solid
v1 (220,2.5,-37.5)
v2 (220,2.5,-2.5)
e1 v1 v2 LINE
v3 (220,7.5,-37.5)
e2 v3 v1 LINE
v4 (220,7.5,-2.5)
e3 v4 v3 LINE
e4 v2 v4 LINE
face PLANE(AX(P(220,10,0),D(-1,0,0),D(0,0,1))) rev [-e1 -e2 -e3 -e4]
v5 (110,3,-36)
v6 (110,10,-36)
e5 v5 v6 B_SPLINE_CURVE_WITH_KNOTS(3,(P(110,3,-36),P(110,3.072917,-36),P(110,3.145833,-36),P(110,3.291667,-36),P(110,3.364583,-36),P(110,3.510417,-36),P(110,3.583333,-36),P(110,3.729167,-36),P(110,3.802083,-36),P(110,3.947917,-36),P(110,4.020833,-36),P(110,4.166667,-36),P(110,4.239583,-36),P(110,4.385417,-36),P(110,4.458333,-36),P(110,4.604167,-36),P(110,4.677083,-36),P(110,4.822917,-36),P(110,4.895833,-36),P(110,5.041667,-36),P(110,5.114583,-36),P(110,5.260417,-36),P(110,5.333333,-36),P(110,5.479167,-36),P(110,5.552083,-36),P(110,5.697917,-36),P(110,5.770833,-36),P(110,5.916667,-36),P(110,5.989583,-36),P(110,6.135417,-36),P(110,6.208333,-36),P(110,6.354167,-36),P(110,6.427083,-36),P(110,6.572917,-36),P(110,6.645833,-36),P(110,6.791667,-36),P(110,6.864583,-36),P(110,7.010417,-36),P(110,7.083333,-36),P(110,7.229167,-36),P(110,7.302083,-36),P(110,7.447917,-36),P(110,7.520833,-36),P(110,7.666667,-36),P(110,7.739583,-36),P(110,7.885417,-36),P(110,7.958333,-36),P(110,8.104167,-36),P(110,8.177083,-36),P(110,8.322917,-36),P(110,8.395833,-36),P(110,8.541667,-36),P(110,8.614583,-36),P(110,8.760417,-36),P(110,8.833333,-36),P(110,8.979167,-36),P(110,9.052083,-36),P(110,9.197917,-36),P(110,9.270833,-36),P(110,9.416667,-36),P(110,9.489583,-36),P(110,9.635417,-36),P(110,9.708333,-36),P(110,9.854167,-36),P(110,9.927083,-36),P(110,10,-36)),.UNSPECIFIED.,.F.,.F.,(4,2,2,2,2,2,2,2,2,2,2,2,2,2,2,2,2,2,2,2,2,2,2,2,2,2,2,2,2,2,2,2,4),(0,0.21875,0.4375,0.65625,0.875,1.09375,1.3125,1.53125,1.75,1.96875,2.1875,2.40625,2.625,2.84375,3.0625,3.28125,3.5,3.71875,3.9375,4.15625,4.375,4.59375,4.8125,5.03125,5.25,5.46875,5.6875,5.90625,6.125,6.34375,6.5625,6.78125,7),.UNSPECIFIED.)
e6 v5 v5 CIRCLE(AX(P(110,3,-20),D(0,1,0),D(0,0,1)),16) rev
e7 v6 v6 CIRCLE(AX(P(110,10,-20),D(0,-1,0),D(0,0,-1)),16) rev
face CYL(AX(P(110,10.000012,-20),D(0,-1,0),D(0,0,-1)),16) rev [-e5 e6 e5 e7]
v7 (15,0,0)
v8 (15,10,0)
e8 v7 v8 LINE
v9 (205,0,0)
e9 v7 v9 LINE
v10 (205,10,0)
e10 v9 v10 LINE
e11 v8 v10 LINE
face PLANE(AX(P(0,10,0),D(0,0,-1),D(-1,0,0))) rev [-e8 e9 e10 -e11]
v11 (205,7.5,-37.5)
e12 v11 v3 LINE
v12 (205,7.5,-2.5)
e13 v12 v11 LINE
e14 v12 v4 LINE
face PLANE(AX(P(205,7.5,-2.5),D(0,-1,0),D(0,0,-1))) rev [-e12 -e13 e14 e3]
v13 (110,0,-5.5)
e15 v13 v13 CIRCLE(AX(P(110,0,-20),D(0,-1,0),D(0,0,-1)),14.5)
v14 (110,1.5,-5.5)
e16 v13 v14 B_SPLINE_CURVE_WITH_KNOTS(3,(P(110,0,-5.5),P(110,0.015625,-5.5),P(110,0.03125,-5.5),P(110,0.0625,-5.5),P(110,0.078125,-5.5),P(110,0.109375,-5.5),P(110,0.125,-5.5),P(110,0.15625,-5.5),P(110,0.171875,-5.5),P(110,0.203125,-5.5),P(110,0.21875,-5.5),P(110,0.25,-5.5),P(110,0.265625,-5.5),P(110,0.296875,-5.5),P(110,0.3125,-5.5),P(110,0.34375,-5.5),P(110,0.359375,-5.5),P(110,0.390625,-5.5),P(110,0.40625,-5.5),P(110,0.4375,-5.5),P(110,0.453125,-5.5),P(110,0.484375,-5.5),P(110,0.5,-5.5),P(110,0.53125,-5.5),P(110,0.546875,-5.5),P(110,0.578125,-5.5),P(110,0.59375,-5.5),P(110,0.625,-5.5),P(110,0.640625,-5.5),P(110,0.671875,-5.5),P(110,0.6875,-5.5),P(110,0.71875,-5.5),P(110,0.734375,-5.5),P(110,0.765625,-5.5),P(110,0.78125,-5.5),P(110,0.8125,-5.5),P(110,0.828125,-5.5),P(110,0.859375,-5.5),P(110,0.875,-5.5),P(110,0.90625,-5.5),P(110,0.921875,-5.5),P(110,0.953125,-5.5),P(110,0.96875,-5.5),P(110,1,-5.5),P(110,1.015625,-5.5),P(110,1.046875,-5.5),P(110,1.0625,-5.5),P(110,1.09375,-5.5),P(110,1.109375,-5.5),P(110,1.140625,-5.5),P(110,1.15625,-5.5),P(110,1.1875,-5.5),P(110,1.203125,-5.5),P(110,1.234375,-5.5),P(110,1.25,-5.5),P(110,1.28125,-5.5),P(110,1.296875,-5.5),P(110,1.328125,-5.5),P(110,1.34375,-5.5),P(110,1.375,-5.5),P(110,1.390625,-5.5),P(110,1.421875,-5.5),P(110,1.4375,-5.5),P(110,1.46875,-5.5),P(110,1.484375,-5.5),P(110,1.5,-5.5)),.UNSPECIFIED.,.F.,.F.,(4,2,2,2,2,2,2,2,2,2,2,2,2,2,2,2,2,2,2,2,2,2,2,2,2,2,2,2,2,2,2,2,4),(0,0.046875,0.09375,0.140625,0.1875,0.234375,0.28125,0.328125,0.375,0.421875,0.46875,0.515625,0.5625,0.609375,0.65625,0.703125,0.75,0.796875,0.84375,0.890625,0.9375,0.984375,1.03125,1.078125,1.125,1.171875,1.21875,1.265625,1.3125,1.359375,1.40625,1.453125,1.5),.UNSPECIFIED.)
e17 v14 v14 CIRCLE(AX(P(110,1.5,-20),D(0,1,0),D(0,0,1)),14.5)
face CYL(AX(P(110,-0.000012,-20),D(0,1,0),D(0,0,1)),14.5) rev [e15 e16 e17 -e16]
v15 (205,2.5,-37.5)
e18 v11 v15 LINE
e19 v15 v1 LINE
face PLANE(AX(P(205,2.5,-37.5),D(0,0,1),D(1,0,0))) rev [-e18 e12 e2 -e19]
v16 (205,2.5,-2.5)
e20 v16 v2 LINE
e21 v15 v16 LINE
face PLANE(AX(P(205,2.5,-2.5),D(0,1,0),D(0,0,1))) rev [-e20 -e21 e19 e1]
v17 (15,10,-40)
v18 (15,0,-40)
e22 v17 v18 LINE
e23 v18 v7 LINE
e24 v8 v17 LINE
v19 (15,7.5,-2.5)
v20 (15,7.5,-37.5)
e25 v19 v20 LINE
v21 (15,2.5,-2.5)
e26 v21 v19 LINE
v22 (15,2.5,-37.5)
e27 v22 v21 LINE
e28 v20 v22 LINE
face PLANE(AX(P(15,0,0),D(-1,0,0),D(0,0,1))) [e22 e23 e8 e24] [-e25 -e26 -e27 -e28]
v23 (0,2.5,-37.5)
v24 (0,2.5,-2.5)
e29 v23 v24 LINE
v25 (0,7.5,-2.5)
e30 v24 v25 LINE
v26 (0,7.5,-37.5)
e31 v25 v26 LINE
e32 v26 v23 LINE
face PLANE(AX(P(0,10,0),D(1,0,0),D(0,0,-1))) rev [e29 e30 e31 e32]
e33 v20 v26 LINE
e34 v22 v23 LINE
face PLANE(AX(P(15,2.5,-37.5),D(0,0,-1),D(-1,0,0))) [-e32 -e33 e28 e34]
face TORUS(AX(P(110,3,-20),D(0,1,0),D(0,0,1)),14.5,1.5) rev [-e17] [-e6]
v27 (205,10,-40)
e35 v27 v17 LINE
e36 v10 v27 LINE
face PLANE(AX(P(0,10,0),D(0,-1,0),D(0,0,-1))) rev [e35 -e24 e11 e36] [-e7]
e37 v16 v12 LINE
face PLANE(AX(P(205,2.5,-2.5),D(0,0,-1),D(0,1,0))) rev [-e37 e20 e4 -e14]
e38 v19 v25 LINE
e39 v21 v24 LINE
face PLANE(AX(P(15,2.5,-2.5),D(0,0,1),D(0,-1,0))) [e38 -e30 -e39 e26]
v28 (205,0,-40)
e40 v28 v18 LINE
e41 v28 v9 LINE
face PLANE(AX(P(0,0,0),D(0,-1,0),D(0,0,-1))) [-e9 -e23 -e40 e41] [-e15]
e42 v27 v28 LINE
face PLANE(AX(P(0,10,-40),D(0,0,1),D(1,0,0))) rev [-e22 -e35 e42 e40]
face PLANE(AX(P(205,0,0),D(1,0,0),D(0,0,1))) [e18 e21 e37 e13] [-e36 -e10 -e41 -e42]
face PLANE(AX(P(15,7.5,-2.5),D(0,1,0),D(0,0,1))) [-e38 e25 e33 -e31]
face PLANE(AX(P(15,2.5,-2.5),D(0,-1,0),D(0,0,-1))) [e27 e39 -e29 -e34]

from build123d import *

# Parameters (mm, degrees)
ESBO_O1_W                  = 220
ESBO_O1_H                  = 40
RESSALTO_EXTRUS_O1_DEPTH   = 10
ESBO_O2_W                  = 40
ESBO_O2_H                  = 10
ESBO_O2_W_2                = 35
ESBO_O2_H_2                = 5
CORTE_EXTRUS_O1_DEPTH      = 15
CORTE_EXTRUS_O2_DEPTH      = 224.830292856
CORTE_EXTRUS_O2_DEPTH_BACK = 224.830292856
ESBO_O3_R                  = 14.5
CORTE_EXTRUS_O3_DEPTH      = 224.830292856
CORTE_EXTRUS_O3_DEPTH_BACK = 8.5
ESBO_O4_R                  = 16
ESBO_O4_R_2                = 14.5
FILETE1_R                  = 1.5


with BuildPart() as part:
    # Esboço1 → Ressalto-extrusão1 (new body)
    with BuildSketch(Plane(origin=(0, 0, 0), x_dir=(1, 0, 0), z_dir=(0, 1, 0))):
        with Locations((110, 20)):
            Rectangle(ESBO_O1_W, ESBO_O1_H)
    extrude(amount=RESSALTO_EXTRUS_O1_DEPTH)

    # Esboço2 → Corte-extrusão1 (cut)
    with BuildSketch(Plane.ZY):
        with Locations((-20, 5)):
            Rectangle(ESBO_O2_W, ESBO_O2_H)
        with Locations((-20, 5)):
            Rectangle(ESBO_O2_W_2, ESBO_O2_H_2, mode=Mode.SUBTRACT)
    corte_extrus_o1 = extrude(amount=-CORTE_EXTRUS_O1_DEPTH, mode=Mode.SUBTRACT)

    # Espelhar1: Corte-extrusão1 across plane
    add(corte_extrus_o1.mirror(Plane.ZY.offset(-110)), mode=Mode.SUBTRACT)

    # Esboço3 → Corte-extrusão2 (cut, two sides: drawn at the far end of the back side and taken through both)
    with BuildSketch(Plane(origin=(0, 0, 0), x_dir=(1, 0, 0), z_dir=(0, 1, 0)).offset(-CORTE_EXTRUS_O2_DEPTH_BACK)):
        with Locations(Location((110, 20, 0), (0, 0, 270))):
            Circle(ESBO_O3_R)
    extrude(amount=CORTE_EXTRUS_O2_DEPTH + CORTE_EXTRUS_O2_DEPTH_BACK, mode=Mode.SUBTRACT)

    # Esboço4 → Corte-extrusão3 (cut, two sides: drawn at the far end of the back side and taken through both)
    with BuildSketch(Plane(origin=(0, 10, 0), x_dir=(1, 0, 0), z_dir=(0, 1, 0)).offset(-CORTE_EXTRUS_O3_DEPTH_BACK)):
        with Locations(Location((110, 20, 0), (0, 0, 90))):
            Circle(ESBO_O4_R)
        with Locations(Location((110, 20, 0), (0, 0, 270))):
            Circle(ESBO_O4_R_2, mode=Mode.SUBTRACT)
    extrude(amount=CORTE_EXTRUS_O3_DEPTH + CORTE_EXTRUS_O3_DEPTH_BACK, mode=Mode.SUBTRACT)

    # Filete1
    filete1_edges = [part.edges().sort_by_distance(p)[0] for p in [
        (110, 1.5, -4),
    ]]
    fillet(filete1_edges, radius=FILETE1_R - 0.0001)  # a hair under: the kernel refuses the full size


solid = part.part
